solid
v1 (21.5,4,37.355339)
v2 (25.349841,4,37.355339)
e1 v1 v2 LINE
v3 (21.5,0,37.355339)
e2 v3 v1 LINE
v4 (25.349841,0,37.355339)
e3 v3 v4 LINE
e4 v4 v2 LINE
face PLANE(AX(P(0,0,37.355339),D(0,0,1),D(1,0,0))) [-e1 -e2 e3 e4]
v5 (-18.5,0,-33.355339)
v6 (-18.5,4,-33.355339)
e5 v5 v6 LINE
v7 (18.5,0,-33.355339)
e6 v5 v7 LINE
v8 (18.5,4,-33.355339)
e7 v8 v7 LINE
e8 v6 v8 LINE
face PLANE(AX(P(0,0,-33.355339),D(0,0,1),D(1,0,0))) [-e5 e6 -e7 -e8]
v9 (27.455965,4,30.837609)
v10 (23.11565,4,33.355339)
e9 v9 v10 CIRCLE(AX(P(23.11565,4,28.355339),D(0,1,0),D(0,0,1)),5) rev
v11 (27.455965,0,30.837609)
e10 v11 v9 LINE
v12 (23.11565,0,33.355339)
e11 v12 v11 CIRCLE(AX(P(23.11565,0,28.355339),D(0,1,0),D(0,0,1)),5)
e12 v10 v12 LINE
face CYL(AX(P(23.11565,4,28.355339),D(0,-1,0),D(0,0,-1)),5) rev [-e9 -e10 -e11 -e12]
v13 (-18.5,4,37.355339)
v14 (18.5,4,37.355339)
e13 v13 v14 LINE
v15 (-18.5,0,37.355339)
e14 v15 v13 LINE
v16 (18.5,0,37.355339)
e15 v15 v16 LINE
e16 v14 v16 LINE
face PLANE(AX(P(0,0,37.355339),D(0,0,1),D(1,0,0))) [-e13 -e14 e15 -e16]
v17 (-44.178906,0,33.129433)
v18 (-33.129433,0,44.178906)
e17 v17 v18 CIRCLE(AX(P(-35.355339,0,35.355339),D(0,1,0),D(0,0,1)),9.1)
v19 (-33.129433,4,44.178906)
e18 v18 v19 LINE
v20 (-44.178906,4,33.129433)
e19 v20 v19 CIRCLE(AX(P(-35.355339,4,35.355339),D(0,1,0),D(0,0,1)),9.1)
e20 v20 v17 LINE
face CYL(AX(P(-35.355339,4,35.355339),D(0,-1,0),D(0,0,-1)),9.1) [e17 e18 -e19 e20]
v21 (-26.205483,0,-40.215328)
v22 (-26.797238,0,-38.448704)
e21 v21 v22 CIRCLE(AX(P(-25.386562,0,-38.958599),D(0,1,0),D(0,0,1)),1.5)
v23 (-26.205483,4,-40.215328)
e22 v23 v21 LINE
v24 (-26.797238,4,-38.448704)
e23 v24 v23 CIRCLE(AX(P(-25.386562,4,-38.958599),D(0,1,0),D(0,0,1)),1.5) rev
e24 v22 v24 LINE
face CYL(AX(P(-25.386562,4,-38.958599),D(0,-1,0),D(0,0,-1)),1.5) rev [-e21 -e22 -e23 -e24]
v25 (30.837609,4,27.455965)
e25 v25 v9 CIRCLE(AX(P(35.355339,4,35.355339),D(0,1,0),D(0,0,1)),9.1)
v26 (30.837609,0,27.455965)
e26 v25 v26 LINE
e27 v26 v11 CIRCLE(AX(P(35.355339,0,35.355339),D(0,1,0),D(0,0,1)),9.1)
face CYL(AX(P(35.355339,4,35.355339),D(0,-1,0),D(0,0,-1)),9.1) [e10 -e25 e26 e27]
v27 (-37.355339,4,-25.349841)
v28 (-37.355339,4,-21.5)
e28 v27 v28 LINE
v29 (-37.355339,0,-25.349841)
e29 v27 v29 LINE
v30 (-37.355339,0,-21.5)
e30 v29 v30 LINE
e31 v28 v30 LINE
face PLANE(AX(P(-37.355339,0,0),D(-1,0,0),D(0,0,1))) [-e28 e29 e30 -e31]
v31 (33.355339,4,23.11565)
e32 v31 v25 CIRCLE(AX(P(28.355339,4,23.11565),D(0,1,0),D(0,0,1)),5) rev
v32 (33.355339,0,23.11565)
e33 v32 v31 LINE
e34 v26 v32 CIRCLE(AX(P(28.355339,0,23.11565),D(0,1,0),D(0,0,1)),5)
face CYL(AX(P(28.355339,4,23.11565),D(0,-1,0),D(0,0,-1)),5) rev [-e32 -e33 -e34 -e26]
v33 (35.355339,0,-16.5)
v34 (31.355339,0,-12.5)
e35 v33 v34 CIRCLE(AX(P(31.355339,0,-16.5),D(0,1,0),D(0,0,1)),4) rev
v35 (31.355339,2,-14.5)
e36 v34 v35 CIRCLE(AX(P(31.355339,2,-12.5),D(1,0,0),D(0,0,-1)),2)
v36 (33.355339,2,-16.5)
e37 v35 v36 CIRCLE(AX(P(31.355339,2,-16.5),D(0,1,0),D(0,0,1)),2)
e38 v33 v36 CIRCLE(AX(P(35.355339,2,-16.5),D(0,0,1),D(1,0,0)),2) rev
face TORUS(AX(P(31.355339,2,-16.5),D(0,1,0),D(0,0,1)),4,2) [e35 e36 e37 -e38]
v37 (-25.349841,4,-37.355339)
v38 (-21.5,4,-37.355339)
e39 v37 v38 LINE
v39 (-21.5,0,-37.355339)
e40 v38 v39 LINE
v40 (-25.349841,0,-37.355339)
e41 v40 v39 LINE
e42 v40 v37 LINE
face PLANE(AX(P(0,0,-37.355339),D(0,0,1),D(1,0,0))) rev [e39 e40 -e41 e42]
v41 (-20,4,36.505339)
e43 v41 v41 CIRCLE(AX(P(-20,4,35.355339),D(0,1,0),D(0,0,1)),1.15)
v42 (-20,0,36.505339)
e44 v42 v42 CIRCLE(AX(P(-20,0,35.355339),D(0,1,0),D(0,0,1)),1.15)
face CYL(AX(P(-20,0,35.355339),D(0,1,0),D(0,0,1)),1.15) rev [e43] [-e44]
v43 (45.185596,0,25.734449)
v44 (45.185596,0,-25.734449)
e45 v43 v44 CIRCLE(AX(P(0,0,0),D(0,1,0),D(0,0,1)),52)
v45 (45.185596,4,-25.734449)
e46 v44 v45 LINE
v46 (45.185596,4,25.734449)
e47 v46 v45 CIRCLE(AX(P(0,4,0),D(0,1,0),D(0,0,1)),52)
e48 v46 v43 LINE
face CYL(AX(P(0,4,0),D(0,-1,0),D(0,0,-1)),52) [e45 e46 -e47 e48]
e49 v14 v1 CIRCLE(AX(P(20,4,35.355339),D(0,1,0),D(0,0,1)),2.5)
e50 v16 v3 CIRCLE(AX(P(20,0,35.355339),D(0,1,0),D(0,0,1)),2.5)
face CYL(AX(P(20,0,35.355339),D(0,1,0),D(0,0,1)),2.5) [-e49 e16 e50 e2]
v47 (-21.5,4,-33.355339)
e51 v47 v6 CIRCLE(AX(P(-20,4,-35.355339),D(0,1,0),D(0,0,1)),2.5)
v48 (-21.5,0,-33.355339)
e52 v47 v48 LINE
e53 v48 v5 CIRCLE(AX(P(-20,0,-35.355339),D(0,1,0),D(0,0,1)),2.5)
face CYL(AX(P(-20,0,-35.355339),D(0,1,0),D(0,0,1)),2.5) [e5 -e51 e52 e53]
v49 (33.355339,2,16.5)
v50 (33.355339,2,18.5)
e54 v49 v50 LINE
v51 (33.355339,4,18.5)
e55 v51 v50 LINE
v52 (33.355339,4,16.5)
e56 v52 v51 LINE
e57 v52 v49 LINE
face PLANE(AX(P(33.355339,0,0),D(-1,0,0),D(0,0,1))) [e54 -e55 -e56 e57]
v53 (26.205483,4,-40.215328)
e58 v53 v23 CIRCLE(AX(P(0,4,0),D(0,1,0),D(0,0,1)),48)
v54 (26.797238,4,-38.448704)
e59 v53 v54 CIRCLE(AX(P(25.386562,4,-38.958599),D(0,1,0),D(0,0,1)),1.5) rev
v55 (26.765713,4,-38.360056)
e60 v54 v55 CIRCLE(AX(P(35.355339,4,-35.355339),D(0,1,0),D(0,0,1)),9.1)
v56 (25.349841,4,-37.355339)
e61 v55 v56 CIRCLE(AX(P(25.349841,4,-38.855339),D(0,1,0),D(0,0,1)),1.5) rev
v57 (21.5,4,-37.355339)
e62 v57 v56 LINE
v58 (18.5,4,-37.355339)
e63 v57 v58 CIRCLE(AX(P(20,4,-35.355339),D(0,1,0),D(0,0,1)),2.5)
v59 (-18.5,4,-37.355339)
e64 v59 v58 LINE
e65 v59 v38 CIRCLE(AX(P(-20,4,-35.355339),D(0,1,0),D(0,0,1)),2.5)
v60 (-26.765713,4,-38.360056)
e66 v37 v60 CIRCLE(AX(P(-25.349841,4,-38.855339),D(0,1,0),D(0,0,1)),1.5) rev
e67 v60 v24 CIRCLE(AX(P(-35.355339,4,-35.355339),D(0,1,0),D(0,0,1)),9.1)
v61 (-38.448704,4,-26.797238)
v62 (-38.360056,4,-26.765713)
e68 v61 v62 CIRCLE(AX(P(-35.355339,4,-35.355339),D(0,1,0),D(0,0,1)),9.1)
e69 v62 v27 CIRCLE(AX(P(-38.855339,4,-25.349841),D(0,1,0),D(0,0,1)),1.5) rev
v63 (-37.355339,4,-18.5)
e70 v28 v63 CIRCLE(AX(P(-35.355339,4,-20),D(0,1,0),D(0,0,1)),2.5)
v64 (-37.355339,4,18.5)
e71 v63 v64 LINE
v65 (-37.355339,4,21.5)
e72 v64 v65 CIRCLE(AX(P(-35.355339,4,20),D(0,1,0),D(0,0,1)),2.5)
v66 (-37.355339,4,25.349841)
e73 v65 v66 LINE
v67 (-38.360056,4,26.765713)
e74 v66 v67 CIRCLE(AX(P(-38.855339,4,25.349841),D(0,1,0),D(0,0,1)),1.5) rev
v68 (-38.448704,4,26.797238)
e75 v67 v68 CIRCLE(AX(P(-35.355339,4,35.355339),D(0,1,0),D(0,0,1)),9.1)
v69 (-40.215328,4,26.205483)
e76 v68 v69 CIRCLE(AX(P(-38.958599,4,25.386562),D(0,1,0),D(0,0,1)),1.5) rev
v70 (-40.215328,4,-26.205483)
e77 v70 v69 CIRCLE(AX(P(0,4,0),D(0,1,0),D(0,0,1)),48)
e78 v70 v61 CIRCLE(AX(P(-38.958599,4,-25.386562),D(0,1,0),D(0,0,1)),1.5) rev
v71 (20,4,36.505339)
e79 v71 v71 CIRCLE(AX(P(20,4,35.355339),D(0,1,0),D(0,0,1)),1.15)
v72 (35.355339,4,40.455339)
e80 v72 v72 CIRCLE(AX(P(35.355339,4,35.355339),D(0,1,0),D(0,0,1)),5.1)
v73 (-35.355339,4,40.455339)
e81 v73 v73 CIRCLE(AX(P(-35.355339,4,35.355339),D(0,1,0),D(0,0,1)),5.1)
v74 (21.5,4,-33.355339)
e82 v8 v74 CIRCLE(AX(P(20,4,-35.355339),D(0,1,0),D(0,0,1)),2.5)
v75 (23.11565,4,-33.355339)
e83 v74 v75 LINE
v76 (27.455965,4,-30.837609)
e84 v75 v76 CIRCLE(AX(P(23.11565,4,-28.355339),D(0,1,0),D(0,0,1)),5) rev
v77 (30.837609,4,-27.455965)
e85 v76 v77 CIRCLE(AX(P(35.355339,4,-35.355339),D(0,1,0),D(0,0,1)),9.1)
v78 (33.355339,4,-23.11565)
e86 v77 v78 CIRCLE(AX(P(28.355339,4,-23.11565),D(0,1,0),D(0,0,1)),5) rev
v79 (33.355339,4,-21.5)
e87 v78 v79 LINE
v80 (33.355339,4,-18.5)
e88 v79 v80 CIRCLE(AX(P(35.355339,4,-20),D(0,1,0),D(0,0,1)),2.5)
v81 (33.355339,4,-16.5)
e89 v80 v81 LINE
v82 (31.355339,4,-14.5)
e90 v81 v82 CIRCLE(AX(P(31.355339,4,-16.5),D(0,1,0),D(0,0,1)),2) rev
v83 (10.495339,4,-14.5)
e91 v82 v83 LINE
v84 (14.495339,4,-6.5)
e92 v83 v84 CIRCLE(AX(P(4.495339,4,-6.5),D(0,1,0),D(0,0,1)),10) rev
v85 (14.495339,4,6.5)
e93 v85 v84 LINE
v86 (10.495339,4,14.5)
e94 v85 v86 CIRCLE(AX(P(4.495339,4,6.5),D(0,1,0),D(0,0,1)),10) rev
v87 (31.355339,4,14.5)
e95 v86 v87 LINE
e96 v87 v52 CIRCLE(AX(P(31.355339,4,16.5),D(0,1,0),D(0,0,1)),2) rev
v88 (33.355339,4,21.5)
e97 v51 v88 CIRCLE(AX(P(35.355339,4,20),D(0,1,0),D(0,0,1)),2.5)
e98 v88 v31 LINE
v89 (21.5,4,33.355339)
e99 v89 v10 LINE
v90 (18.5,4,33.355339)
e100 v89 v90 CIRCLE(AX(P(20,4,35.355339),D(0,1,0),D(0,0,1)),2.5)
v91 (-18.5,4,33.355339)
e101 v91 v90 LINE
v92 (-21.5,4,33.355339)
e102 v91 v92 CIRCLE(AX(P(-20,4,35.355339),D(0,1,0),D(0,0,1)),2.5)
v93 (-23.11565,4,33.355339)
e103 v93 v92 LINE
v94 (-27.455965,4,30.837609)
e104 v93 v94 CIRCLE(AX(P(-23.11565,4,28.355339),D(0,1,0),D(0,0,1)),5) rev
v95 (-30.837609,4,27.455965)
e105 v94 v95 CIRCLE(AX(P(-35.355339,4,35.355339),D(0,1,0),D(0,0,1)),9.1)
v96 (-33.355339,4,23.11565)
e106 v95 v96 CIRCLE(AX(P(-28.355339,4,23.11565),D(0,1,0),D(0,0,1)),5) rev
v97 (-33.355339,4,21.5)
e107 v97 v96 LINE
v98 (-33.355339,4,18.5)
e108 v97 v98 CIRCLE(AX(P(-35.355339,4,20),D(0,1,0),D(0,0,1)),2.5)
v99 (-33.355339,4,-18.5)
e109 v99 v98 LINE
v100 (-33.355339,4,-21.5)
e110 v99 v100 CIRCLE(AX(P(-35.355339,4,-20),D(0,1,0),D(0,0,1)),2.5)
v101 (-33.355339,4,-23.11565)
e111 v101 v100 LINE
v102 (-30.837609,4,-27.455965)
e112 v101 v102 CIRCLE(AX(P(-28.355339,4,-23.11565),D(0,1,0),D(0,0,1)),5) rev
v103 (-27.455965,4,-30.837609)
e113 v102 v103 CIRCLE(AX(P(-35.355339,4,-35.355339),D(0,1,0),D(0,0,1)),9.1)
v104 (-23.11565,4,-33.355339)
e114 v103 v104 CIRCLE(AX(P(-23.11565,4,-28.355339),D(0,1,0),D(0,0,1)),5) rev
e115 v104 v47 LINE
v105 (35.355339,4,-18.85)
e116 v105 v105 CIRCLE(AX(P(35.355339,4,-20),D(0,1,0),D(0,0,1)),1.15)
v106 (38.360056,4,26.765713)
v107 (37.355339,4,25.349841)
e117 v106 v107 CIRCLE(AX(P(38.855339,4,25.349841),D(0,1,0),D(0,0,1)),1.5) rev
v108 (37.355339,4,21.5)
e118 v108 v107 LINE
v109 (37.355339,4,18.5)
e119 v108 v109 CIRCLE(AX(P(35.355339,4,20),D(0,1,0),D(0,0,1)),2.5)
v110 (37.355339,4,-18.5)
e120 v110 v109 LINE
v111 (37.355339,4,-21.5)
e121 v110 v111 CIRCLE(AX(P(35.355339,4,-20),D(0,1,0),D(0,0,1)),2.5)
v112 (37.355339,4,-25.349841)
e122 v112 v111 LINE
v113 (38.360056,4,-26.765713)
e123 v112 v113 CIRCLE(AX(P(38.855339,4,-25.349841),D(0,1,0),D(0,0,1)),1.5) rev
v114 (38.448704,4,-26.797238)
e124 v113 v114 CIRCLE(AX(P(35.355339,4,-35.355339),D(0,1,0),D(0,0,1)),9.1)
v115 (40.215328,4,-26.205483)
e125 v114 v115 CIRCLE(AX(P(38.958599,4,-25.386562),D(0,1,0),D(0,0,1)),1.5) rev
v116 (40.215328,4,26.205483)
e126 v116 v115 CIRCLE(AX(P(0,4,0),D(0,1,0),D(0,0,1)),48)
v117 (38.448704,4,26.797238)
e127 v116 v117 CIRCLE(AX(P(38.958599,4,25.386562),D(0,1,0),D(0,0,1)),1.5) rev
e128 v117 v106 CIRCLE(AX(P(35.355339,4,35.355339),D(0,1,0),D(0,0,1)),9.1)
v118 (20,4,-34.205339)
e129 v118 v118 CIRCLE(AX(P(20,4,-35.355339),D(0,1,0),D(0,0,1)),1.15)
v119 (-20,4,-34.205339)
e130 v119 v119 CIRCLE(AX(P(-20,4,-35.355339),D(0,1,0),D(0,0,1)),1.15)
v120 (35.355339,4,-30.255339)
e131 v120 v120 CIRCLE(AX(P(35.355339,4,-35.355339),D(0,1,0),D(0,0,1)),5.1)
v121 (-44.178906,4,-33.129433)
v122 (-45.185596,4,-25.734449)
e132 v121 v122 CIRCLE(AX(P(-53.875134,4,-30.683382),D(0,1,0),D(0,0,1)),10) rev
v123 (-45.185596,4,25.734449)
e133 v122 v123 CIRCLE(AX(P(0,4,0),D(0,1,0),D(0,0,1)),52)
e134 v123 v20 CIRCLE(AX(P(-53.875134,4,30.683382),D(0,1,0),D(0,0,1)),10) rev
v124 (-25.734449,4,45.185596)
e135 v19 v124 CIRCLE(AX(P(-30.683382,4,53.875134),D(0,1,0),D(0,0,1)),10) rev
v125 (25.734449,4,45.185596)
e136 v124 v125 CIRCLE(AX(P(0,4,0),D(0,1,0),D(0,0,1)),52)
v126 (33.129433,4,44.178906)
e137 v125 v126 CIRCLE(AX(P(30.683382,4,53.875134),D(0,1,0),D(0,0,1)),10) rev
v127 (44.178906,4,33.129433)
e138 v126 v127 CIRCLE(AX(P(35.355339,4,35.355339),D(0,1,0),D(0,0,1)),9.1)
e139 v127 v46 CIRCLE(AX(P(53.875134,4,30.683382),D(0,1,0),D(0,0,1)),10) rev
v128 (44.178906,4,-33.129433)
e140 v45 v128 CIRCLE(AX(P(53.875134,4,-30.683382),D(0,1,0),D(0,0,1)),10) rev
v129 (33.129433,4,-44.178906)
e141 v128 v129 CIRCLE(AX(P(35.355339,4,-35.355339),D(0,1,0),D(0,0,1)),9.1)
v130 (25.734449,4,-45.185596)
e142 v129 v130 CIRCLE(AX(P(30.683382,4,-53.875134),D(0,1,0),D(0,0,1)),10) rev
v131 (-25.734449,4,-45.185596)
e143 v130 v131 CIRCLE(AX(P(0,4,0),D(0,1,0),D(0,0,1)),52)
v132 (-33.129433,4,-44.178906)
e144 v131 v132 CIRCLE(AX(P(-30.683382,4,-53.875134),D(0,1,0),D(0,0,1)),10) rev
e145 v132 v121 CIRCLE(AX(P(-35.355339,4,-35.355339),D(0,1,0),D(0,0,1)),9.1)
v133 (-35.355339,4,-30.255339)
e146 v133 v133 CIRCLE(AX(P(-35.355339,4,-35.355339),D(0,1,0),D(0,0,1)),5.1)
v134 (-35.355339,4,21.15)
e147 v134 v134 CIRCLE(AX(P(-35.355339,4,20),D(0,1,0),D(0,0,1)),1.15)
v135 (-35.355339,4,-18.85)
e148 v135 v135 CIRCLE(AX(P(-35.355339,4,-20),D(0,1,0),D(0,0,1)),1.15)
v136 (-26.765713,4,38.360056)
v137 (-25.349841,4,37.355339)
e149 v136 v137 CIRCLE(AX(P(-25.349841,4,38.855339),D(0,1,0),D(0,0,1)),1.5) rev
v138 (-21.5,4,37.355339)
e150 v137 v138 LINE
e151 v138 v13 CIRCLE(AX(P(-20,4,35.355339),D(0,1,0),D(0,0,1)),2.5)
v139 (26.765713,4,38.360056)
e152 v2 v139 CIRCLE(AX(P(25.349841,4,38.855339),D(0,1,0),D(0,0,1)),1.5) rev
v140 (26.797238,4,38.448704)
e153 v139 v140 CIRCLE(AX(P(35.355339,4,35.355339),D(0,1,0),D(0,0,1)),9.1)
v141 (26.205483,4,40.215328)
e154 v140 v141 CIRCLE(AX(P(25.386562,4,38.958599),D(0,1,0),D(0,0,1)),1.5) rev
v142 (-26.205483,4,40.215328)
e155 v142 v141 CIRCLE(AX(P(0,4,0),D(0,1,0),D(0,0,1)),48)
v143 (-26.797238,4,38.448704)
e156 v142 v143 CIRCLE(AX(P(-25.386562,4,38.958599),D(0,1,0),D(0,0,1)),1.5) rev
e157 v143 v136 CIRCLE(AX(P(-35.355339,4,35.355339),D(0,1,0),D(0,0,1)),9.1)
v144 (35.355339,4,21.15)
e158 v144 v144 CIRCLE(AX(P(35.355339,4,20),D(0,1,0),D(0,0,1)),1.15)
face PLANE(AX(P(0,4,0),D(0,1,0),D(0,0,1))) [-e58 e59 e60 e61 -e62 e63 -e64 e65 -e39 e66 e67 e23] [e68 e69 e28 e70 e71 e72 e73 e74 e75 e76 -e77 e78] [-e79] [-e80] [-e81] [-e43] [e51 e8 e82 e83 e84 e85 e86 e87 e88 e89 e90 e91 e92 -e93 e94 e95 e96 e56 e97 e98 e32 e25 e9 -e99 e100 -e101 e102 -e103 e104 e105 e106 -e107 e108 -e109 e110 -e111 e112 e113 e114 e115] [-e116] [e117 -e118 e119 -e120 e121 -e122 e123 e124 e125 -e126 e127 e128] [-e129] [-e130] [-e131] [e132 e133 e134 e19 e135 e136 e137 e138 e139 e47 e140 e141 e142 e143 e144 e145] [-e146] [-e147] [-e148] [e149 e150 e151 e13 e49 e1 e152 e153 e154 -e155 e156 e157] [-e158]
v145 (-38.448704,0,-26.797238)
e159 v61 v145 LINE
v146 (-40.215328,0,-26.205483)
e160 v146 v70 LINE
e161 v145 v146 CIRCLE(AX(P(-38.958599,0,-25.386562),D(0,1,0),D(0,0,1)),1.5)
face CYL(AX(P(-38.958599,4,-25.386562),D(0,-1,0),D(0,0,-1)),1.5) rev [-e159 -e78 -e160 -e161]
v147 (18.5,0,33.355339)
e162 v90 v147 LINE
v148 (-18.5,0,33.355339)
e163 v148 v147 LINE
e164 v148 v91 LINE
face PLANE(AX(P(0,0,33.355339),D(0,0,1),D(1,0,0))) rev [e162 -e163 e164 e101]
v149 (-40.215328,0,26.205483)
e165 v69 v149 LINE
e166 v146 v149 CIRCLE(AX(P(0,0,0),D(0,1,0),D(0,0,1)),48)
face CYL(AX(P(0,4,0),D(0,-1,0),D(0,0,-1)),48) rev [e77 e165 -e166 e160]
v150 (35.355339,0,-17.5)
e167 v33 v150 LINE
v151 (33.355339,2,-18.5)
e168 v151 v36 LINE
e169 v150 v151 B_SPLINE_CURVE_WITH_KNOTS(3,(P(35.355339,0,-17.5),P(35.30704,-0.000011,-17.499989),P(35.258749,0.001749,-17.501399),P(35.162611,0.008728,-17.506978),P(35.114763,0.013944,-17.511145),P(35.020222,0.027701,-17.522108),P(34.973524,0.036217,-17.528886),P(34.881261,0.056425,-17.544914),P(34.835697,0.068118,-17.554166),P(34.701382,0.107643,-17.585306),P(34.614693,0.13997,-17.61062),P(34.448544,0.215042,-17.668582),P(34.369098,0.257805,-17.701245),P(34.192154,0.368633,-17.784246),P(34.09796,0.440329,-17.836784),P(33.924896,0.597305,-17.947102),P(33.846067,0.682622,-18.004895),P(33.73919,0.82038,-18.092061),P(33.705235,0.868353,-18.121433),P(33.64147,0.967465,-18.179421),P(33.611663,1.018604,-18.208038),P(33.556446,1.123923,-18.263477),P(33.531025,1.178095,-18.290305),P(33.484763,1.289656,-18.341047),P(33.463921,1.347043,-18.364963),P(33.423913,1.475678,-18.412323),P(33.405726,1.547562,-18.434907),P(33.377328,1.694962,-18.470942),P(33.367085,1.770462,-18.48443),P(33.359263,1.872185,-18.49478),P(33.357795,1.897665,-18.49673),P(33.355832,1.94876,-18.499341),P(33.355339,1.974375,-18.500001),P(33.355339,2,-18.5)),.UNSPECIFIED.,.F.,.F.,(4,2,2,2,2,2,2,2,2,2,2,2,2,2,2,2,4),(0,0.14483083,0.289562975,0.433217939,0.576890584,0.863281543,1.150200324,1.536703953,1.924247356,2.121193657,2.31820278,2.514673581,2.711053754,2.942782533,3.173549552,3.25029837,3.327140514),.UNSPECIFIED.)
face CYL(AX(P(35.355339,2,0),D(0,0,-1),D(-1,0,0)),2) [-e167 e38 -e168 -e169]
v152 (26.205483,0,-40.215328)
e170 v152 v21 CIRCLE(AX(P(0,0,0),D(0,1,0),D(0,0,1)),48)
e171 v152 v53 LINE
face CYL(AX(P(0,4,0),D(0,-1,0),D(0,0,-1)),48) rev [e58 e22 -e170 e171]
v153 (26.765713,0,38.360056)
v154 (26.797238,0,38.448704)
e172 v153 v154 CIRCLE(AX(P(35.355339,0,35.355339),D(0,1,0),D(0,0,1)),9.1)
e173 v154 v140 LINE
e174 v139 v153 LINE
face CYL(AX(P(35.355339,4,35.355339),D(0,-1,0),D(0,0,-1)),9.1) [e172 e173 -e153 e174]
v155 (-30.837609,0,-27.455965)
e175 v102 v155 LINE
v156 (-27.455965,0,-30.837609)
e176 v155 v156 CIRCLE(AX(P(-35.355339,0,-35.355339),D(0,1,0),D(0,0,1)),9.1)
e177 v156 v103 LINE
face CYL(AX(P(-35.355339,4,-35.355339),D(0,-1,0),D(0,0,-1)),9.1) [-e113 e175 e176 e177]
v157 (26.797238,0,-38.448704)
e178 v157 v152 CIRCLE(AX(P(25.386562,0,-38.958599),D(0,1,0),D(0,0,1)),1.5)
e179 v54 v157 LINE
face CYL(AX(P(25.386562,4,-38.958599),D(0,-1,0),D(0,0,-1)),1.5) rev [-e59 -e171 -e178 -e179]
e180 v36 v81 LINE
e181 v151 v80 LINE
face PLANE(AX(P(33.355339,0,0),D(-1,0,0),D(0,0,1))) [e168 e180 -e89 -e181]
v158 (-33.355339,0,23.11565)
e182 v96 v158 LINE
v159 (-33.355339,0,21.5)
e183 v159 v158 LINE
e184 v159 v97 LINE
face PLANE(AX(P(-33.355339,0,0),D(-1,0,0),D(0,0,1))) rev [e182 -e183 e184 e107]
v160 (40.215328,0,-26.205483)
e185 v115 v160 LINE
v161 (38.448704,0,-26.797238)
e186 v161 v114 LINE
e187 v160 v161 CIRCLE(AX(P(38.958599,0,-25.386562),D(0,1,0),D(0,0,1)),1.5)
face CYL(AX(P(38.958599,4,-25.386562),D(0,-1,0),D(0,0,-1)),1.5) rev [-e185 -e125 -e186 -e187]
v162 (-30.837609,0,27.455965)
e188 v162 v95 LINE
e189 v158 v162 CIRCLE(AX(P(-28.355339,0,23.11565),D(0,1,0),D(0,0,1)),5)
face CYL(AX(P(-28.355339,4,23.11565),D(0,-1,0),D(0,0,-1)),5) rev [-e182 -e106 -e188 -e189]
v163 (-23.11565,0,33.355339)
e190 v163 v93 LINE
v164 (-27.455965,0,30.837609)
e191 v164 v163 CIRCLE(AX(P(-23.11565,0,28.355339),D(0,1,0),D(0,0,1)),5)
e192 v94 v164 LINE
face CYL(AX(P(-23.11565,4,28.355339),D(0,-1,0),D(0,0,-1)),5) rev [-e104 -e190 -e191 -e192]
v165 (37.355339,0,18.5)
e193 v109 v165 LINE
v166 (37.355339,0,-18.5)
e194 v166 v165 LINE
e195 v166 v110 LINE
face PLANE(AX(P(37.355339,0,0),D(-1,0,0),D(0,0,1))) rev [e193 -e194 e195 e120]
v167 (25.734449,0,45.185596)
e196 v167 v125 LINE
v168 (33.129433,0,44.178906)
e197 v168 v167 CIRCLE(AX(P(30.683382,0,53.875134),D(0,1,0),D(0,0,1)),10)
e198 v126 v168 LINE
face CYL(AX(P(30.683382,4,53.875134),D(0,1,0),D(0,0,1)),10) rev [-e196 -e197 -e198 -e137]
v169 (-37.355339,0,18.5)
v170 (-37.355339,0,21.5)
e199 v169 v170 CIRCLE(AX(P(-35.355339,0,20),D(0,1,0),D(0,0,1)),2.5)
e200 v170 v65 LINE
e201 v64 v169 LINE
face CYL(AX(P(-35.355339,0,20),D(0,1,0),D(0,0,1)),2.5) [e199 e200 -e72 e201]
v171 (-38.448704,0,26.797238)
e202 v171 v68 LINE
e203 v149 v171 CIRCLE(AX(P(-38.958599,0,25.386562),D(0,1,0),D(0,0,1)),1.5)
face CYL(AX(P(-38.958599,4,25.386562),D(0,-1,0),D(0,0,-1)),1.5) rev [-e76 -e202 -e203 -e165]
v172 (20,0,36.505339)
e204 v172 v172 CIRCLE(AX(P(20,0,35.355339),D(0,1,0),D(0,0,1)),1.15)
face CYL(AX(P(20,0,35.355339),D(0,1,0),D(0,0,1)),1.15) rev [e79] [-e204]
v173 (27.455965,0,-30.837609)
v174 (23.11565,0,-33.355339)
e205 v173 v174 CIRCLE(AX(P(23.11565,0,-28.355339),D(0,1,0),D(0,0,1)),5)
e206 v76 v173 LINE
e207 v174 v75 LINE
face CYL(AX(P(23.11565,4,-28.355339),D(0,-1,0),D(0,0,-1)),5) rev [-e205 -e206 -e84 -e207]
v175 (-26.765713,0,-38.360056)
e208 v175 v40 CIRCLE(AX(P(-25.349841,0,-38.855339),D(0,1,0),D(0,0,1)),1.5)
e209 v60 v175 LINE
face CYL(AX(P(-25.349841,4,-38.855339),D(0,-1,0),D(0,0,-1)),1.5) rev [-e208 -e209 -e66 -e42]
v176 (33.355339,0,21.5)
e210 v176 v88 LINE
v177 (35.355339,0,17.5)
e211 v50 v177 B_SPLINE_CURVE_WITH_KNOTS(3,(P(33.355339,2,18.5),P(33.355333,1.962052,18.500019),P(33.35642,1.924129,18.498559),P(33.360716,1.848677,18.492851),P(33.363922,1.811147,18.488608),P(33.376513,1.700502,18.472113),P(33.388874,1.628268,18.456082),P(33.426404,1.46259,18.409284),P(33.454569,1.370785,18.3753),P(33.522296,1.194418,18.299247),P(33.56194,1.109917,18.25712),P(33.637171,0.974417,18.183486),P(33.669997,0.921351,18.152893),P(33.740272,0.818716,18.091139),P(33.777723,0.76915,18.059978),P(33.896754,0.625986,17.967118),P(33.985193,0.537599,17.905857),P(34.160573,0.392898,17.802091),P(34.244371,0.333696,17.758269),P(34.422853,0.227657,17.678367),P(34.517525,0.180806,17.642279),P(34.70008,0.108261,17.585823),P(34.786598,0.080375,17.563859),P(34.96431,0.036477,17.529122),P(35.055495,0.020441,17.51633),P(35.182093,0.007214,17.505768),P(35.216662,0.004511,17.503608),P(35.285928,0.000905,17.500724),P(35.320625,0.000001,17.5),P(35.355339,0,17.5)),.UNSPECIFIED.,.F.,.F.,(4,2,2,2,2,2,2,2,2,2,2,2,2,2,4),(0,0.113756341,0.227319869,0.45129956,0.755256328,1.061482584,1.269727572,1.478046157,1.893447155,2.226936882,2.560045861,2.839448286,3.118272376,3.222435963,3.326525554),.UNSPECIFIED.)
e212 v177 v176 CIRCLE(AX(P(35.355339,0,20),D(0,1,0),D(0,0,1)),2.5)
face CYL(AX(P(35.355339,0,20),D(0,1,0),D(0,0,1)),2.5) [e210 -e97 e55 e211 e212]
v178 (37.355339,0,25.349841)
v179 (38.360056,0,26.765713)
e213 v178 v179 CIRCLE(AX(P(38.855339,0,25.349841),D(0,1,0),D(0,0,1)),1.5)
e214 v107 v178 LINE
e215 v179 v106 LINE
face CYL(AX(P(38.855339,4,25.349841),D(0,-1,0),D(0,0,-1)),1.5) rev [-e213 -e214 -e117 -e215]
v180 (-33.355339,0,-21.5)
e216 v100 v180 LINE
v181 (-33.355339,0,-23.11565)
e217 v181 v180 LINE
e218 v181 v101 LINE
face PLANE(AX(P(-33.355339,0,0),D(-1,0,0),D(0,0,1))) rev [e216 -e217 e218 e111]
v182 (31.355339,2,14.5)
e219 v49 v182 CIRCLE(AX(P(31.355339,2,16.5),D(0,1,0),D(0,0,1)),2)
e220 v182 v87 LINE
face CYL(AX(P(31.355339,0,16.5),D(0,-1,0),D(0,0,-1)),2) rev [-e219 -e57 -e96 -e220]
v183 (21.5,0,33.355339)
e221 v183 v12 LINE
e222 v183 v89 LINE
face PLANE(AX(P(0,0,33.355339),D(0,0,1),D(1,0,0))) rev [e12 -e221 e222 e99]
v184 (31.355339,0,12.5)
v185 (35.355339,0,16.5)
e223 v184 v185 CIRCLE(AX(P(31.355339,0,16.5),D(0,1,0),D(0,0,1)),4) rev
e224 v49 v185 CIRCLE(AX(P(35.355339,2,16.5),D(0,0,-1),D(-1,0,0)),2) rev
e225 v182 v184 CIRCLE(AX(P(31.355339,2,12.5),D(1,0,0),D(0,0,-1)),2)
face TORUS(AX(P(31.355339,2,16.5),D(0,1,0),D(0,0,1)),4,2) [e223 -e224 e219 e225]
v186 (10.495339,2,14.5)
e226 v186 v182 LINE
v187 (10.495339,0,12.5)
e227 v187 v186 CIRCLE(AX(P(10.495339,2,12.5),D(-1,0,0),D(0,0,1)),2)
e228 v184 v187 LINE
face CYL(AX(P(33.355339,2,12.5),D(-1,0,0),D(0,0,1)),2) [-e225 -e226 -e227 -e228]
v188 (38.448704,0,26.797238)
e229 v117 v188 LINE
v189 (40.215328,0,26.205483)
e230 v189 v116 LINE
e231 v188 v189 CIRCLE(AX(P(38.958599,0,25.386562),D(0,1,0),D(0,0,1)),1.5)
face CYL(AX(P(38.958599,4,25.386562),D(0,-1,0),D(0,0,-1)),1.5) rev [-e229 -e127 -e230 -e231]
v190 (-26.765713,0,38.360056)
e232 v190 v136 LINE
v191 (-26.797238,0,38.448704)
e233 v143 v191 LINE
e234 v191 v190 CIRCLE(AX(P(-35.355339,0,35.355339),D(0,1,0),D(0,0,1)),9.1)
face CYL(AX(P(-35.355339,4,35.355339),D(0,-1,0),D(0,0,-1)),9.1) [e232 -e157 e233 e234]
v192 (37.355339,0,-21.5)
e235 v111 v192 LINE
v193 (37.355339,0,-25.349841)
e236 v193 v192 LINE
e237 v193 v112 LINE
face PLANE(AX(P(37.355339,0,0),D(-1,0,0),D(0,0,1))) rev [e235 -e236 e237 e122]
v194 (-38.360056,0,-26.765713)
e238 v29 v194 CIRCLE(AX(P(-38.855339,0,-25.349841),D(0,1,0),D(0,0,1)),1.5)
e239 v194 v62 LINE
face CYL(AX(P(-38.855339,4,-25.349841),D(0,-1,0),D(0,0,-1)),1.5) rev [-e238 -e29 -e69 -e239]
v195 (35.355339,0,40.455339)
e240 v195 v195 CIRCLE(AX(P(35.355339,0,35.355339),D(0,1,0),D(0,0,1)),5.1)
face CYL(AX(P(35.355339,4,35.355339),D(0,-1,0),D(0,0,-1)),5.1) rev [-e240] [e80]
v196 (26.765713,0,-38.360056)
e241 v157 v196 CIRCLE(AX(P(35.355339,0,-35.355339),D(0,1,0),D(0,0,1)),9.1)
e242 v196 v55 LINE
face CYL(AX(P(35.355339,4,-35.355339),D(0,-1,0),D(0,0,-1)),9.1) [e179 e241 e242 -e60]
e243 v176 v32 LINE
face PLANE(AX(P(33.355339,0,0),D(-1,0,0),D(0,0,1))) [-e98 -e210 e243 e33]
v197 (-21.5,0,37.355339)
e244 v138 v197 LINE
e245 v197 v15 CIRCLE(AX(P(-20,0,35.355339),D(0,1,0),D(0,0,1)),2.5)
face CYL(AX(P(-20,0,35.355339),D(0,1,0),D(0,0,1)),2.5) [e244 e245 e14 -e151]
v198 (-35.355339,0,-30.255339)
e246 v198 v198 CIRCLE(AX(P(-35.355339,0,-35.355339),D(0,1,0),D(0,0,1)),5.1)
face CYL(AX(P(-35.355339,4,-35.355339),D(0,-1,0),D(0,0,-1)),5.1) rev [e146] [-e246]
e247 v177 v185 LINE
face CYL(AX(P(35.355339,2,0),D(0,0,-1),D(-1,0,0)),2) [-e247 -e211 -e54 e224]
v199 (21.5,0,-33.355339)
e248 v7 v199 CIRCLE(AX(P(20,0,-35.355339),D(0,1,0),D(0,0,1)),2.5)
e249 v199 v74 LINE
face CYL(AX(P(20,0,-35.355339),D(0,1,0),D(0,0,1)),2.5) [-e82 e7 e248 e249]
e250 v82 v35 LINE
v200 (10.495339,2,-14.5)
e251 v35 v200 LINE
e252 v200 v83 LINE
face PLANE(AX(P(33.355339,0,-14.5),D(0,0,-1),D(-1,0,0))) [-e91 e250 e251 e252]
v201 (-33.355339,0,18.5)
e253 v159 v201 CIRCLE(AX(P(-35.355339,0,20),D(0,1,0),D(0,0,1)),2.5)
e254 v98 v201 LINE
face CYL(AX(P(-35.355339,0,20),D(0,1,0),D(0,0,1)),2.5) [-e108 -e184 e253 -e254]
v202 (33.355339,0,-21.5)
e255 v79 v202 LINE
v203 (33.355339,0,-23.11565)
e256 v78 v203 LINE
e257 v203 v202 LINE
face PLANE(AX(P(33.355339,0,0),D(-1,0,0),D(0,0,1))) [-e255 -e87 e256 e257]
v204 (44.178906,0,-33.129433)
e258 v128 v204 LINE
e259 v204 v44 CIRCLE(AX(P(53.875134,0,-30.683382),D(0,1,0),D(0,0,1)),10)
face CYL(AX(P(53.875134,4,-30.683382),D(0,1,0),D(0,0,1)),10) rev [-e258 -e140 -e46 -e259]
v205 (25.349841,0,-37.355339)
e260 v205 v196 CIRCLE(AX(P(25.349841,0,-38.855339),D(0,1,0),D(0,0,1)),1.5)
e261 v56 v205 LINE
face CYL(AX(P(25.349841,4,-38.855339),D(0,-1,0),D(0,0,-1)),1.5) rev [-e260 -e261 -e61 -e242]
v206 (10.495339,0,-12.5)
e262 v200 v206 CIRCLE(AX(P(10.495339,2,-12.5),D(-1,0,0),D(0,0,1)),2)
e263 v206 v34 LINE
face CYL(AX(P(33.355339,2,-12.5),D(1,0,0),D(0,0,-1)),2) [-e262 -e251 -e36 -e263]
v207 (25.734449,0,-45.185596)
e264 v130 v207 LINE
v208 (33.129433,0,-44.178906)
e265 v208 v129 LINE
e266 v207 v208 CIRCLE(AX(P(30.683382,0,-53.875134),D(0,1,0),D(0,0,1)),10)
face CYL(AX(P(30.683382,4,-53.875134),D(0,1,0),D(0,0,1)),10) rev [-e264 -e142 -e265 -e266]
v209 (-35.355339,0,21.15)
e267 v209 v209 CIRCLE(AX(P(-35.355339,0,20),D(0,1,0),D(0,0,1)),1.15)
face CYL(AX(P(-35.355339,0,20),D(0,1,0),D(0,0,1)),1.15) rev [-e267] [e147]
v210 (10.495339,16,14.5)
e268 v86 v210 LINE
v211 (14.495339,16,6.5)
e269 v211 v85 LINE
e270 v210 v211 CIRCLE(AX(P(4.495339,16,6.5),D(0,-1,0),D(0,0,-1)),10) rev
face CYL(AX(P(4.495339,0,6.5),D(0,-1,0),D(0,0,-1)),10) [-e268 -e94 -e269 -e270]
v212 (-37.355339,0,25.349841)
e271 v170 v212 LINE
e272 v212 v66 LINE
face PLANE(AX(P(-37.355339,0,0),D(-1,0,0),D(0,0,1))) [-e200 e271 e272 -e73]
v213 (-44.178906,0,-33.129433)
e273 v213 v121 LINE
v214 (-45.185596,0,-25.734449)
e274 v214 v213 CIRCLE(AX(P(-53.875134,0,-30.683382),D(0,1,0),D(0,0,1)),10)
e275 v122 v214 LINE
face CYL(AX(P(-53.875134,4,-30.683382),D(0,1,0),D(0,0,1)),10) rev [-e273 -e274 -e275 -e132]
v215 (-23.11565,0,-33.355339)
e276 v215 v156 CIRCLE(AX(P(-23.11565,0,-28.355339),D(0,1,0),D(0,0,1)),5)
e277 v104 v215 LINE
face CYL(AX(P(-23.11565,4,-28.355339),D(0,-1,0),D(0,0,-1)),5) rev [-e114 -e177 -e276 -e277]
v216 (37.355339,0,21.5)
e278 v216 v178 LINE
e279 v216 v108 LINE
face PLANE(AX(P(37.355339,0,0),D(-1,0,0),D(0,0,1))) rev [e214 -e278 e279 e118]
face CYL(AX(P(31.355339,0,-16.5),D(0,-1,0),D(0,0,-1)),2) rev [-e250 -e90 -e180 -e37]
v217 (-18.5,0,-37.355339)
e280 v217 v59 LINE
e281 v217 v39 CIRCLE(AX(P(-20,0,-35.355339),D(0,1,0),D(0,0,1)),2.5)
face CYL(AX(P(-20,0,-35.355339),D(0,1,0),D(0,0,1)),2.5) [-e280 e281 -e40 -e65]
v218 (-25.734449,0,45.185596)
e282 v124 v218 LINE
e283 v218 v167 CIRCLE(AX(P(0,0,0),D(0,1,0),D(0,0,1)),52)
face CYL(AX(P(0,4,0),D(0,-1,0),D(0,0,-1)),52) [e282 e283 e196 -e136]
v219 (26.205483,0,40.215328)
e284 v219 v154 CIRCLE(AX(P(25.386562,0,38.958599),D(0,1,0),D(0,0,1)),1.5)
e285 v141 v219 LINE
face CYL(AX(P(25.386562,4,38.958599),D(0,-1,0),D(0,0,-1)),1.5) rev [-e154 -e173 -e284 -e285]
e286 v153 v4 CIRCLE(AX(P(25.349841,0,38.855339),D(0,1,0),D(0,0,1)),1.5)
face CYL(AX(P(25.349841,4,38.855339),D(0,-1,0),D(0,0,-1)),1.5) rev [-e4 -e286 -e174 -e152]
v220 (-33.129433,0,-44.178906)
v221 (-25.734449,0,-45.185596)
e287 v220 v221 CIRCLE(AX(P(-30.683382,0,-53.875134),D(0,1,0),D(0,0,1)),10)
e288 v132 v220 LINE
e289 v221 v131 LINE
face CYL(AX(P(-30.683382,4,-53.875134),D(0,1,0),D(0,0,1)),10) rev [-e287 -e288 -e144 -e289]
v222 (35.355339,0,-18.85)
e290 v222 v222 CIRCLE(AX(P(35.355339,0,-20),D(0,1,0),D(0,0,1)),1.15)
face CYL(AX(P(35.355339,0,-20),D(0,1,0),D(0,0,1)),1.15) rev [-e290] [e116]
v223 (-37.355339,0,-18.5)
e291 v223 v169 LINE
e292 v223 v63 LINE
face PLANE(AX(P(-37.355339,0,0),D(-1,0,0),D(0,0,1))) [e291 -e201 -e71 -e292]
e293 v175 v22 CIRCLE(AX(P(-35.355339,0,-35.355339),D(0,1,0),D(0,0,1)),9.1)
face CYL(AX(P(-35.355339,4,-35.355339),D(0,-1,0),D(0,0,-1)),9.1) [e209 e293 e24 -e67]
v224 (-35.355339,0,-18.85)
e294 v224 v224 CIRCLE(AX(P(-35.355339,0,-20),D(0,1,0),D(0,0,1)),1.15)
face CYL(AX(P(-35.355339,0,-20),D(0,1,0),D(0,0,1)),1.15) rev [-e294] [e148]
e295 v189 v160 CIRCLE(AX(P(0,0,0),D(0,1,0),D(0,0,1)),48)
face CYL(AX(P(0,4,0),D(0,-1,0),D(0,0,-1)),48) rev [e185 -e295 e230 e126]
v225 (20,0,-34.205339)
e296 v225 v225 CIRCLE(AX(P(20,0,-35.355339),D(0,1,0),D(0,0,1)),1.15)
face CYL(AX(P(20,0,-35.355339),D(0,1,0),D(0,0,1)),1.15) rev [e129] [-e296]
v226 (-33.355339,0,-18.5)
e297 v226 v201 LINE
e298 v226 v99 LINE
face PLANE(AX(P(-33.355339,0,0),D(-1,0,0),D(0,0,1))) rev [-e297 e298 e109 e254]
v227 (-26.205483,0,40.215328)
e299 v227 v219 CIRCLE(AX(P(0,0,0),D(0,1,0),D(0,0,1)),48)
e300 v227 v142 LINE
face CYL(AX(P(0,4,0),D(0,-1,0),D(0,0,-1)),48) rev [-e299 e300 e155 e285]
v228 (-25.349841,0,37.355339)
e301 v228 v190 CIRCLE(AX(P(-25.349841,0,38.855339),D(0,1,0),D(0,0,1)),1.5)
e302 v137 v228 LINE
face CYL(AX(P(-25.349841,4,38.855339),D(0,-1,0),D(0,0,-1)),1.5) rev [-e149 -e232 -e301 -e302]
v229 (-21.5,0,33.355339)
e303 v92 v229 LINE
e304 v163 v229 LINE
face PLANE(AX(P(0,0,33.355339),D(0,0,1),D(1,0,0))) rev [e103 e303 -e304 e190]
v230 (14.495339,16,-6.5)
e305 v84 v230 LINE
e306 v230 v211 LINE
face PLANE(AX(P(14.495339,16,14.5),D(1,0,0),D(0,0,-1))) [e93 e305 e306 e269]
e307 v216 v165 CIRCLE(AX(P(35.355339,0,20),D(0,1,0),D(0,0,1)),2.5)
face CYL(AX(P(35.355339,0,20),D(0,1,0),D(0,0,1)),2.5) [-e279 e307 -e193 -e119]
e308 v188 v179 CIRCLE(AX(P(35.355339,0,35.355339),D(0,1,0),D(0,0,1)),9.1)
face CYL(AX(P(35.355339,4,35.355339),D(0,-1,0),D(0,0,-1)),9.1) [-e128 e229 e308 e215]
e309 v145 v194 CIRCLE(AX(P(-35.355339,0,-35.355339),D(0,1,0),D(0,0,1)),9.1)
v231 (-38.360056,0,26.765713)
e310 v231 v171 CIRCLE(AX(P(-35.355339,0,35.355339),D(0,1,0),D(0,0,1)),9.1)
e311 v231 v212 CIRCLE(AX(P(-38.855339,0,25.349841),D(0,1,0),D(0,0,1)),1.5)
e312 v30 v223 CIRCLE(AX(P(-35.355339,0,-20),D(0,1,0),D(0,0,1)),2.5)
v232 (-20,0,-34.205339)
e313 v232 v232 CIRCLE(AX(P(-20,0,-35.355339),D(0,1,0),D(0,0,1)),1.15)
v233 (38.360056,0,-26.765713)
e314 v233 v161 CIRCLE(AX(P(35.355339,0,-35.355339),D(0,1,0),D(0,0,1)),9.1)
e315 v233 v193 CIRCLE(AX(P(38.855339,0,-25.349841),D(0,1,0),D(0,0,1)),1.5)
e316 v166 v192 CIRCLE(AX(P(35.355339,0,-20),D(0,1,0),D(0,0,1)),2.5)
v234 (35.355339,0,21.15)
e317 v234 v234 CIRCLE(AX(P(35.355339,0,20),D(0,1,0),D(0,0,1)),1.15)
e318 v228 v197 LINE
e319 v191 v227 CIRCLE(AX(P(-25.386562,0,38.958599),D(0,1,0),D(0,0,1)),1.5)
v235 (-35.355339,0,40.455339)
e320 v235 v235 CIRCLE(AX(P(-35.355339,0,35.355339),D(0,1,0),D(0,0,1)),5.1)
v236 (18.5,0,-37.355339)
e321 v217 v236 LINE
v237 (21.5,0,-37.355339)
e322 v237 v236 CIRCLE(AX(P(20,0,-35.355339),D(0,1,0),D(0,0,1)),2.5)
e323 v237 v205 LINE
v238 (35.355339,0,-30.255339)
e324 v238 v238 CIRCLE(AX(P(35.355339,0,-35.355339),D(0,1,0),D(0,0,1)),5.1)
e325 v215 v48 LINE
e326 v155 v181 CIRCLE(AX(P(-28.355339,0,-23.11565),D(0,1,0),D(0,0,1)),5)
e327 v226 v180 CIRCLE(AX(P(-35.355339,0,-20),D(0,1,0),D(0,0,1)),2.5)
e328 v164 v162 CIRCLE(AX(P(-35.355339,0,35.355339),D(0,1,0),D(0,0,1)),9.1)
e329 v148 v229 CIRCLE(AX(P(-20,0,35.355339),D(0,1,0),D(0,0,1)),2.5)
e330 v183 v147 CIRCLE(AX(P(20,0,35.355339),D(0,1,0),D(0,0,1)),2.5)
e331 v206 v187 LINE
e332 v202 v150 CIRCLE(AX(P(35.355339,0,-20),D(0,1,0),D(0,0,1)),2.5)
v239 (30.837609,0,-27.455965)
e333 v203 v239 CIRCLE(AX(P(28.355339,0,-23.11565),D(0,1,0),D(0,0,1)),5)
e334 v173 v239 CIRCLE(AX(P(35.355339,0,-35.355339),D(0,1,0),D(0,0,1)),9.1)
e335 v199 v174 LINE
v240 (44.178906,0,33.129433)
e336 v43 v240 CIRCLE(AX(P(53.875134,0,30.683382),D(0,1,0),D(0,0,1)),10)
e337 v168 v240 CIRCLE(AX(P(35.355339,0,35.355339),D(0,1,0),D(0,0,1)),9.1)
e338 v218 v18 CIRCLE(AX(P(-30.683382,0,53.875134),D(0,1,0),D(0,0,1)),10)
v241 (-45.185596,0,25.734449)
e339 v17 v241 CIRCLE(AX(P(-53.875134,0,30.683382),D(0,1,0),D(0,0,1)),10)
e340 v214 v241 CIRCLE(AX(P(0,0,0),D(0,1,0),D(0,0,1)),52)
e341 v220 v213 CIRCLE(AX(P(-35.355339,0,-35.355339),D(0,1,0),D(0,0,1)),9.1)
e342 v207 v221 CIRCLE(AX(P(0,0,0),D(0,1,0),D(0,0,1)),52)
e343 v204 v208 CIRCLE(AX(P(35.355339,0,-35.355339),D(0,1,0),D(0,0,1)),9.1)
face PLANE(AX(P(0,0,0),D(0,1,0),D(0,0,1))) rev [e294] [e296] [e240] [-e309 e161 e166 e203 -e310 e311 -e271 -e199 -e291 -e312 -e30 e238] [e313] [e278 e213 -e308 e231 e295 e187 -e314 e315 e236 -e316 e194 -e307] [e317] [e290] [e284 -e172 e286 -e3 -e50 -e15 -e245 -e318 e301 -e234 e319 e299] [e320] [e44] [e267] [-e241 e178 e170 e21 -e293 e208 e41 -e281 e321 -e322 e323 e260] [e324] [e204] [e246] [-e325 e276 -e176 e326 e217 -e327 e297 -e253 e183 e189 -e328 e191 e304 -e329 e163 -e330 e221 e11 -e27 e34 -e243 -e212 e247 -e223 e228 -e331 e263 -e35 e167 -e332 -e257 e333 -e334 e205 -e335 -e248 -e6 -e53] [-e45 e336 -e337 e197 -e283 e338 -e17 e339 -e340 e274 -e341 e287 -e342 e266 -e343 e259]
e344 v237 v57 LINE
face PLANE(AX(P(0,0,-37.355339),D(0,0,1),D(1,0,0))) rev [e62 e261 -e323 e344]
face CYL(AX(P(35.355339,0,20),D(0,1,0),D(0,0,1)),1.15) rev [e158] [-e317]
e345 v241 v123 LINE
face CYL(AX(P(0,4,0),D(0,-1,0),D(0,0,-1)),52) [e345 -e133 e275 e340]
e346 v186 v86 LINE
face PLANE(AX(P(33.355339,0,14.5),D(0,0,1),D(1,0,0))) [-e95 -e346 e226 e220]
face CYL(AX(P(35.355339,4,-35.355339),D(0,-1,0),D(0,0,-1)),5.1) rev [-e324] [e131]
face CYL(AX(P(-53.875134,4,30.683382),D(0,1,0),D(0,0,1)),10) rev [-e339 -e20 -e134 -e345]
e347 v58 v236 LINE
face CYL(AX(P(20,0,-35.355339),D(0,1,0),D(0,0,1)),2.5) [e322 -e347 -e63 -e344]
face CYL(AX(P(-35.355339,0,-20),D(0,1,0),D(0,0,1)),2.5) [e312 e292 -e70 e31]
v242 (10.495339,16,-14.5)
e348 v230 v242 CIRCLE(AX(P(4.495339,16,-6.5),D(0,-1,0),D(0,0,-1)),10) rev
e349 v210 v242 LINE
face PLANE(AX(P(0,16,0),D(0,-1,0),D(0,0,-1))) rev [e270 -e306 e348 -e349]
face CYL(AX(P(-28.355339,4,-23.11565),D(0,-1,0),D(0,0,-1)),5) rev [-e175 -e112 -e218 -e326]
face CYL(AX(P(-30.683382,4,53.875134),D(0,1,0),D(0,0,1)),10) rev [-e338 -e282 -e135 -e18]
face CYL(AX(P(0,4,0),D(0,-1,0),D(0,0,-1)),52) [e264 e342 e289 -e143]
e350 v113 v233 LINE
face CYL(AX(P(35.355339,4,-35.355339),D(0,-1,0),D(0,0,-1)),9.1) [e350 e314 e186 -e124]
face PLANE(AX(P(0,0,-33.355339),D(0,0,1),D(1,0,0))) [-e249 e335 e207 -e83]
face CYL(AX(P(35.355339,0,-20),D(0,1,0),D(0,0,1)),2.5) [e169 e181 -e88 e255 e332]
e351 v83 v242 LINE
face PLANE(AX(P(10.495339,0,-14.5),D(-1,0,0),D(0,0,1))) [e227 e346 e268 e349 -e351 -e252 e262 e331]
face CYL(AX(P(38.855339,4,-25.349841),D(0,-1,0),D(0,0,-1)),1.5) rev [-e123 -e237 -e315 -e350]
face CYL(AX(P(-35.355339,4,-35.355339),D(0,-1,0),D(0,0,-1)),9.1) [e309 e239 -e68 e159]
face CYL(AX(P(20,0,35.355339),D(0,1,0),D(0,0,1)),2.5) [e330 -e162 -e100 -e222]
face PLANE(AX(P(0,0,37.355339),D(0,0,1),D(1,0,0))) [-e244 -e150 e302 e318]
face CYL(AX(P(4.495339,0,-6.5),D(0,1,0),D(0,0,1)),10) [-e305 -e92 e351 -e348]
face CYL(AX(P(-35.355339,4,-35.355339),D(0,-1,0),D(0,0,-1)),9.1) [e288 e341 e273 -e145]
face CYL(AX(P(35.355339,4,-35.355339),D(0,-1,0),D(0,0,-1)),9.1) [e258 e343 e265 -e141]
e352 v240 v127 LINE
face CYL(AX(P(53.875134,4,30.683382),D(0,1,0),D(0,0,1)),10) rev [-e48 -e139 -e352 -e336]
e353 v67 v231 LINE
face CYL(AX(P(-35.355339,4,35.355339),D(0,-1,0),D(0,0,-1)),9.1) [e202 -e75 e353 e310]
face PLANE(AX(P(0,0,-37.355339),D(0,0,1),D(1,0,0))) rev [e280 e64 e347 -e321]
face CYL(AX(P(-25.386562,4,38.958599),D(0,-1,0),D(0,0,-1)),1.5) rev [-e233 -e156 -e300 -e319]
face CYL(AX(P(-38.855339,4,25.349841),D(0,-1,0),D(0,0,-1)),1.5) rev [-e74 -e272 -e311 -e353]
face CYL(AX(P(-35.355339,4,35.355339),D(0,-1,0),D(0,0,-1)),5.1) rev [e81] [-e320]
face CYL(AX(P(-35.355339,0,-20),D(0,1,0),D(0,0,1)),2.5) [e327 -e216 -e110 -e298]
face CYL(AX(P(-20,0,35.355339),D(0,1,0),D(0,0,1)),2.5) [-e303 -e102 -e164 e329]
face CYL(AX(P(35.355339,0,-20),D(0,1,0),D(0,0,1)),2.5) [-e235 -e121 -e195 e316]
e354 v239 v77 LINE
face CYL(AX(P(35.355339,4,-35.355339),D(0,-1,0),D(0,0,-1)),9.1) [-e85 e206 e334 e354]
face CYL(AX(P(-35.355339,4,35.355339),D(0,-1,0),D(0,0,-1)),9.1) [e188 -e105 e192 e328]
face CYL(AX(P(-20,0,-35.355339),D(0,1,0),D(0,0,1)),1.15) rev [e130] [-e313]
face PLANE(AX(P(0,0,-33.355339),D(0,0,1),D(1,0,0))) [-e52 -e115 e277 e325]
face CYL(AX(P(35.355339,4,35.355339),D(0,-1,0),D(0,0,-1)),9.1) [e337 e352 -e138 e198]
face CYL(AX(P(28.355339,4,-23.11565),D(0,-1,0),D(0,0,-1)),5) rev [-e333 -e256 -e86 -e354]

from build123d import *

# Parameters (mm, degrees)
SKETCH1_R           = 5.1
BOSS_EXTRUDE1_DEPTH = 4
BOSS_EXTRUDE2_START = -4
BOSS_EXTRUDE2_DEPTH = 4
SKETCH3_R           = 2.5
BOSS_EXTRUDE3_DEPTH = 4
SKETCH4_R           = 1.15
CUT_EXTRUDE1_DEPTH  = 4
FILLET1_R           = 10
FILLET2_R           = 1.5
FILLET3_R           = 5
SKETCH5_W           = 22.86
SKETCH5_H           = 29
BOSS_EXTRUDE4_DEPTH = 4
SKETCH6_W           = 4
SKETCH6_H           = 29
BOSS_EXTRUDE5_DEPTH = 16
FILLET4_R           = 10
FILLET5_R           = 2


with BuildPart() as part:
    # Sketch1 → Boss-Extrude1 (new body)
    with BuildSketch(Plane(origin=(0, 0, 0), x_dir=(1, 0, 0), z_dir=(0, 1, 0))):
        with BuildLine():
            ThreePointArc((-42.589636172, 29.834927363), (-52, 0), (-42.589636172, -29.834927363))
            ThreePointArc((-42.589636172, -29.834927363), (-41.790010768, -41.790010768), (-29.834927363, -42.589636172))
            ThreePointArc((-29.834927363, -42.589636172), (0, -52), (29.834927363, -42.589636172))
            ThreePointArc((29.834927363, -42.589636172), (41.790010768, -41.790010768), (42.589636172, -29.834927363))
            ThreePointArc((42.589636172, -29.834927363), (52, 0), (42.589636172, 29.834927363))
            ThreePointArc((42.589636172, 29.834927363), (41.790010768, 41.790010768), (29.834927363, 42.589636172))
            ThreePointArc((29.834927363, 42.589636172), (0, 52), (-29.834927363, 42.589636172))
            ThreePointArc((-29.834927363, 42.589636172), (-41.790010768, 41.790010768), (-42.589636172, 29.834927363))
        make_face()
        with Locations(Location((-35.355339059, -35.355339059, 0), (0, 0, 270))):
            Circle(SKETCH1_R, mode=Mode.SUBTRACT)
        with Locations(Location((35.355339059, -35.355339059, 0), (0, 0, 270))):
            Circle(SKETCH1_R, mode=Mode.SUBTRACT)
        with BuildLine():
            ThreePointArc((-27.258640426, -39.509068859), (-28.920667351, -28.920667351), (-39.509068859, -27.258640426))
            ThreePointArc((-39.509068859, -27.258640426), (-48, 0), (-39.509068859, 27.258640426))
            ThreePointArc((-39.509068859, 27.258640426), (-28.920667351, 28.920667351), (-27.258640426, 39.509068859))
            ThreePointArc((-27.258640426, 39.509068859), (0, 48), (27.258640426, 39.509068859))
            ThreePointArc((27.258640426, 39.509068859), (28.920667351, 28.920667351), (39.509068859, 27.258640426))
            ThreePointArc((39.509068859, 27.258640426), (48, 0), (39.509068859, -27.258640426))
            ThreePointArc((39.509068859, -27.258640426), (28.920667351, -28.920667351), (27.258640426, -39.509068859))
            ThreePointArc((27.258640426, -39.509068859), (0, -48), (-27.258640426, -39.509068859))
        make_face(mode=Mode.SUBTRACT)
        with Locations(Location((-35.355339059, 35.355339059, 0), (0, 0, 270))):
            Circle(SKETCH1_R, mode=Mode.SUBTRACT)
        with Locations(Location((35.355339059, 35.355339059, 0), (0, 0, 270))):
            Circle(SKETCH1_R, mode=Mode.SUBTRACT)
    extrude(amount=BOSS_EXTRUDE1_DEPTH)

    # Sketch2 → Boss-Extrude2 (add)
    with BuildSketch(Plane(origin=(0, 4, 0), x_dir=(1, 0, 0), z_dir=(0, 1, 0)).offset(BOSS_EXTRUDE2_START)):
        with BuildLine():
            ThreePointArc((-26.255339059, 35.355339059), (-26.311135203, 34.349169788), (-26.477839411, 33.355339059))
            Line((-26.477839411, 33.355339059), (26.477839411, 33.355339059))
            ThreePointArc((26.477839411, 33.355339059), (26.255339059, 35.355339059), (26.477839411, 37.355339059))
            Line((26.477839411, 37.355339059), (-26.477839411, 37.355339059))
            ThreePointArc((-26.477839411, 37.355339059), (-26.311135203, 36.36150833), (-26.255339059, 35.355339059))
        make_face()
        with BuildLine():
            Line((-33.355339059, -26.477839411), (-33.355339059, 26.477839411))
            ThreePointArc((-33.355339059, 26.477839411), (-35.355339059, 26.255339059), (-37.355339059, 26.477839411))
            Line((-37.355339059, 26.477839411), (-37.355339059, -26.477839411))
            ThreePointArc((-37.355339059, -26.477839411), (-35.355339059, -26.255339059), (-33.355339059, -26.477839411))
        make_face()
        with BuildLine():
            ThreePointArc((37.355339059, 26.477839411), (35.355339059, 26.255339059), (33.355339059, 26.477839411))
            Line((33.355339059, 26.477839411), (33.355339059, -26.477839411))
            ThreePointArc((33.355339059, -26.477839411), (35.355339059, -26.255339059), (37.355339059, -26.477839411))
            Line((37.355339059, -26.477839411), (37.355339059, 26.477839411))
        make_face()
        with BuildLine():
            Line((26.477839411, -33.355339059), (-26.477839411, -33.355339059))
            ThreePointArc((-26.477839411, -33.355339059), (-26.311135203, -34.349169788), (-26.255339059, -35.355339059))
            ThreePointArc((-26.255339059, -35.355339059), (-26.311135203, -36.36150833), (-26.477839411, -37.355339059))
            Line((-26.477839411, -37.355339059), (26.477839411, -37.355339059))
            ThreePointArc((26.477839411, -37.355339059), (26.255339059, -35.355339059), (26.477839411, -33.355339059))
        make_face()
    extrude(amount=BOSS_EXTRUDE2_DEPTH)

    # Sketch3 → Boss-Extrude3 (add)
    with BuildSketch(Plane(origin=(0, 4, 0), x_dir=(1, 0, 0), z_dir=(0, 1, 0))):
        with Locations((-20, 35.355339059)):
            Circle(SKETCH3_R)
        with Locations((20, 35.355339059)):
            Circle(SKETCH3_R)
        with Locations((35.355339059, 20)):
            Circle(SKETCH3_R)
        with Locations((35.355339059, -20)):
            Circle(SKETCH3_R)
        with Locations((-35.355339059, -20)):
            Circle(SKETCH3_R)
        with Locations((-35.355339059, 20)):
            Circle(SKETCH3_R)
        with Locations((-20, -35.355339059)):
            Circle(SKETCH3_R)
        with Locations((20, -35.355339059)):
            Circle(SKETCH3_R)
    extrude(amount=-BOSS_EXTRUDE3_DEPTH)

    # Sketch4 → Cut-Extrude1 (cut)
    with BuildSketch(Plane(origin=(0, 4, 0), x_dir=(1, 0, 0), z_dir=(0, 1, 0))):
        with Locations(Location((-20, 35.355339059, 0), (0, 0, 270))):
            Circle(SKETCH4_R)
        with Locations(Location((20, 35.355339059, 0), (0, 0, 270))):
            Circle(SKETCH4_R)
        with Locations(Location((-35.355339059, 20, 0), (0, 0, 270))):
            Circle(SKETCH4_R)
        with Locations(Location((-35.355339059, -20, 0), (0, 0, 270))):
            Circle(SKETCH4_R)
        with Locations(Location((-20, -35.355339059, 0), (0, 0, 270))):
            Circle(SKETCH4_R)
        with Locations(Location((20, -35.355339059, 0), (0, 0, 270))):
            Circle(SKETCH4_R)
        with Locations(Location((35.355339059, -20, 0), (0, 0, 270))):
            Circle(SKETCH4_R)
        with Locations(Location((35.355339059, 20, 0), (0, 0, 270))):
            Circle(SKETCH4_R)
    extrude(amount=-CUT_EXTRUDE1_DEPTH, mode=Mode.SUBTRACT)

    # Fillet1
    fillet1_edges = [part.edges().sort_by_distance(p)[0] for p in [
        (-42.589636172, 2, 29.834927363),
        (-42.589636172, 2, -29.834927363),
        (-29.834927363, 2, -42.589636172),
        (29.834927363, 2, -42.589636172),
        (42.589636172, 2, -29.834927363),
        (42.589636172, 2, 29.834927363),
        (29.834927363, 2, 42.589636172),
        (-29.834927363, 2, 42.589636172),
    ]]
    fillet(fillet1_edges, radius=FILLET1_R)

    # Fillet2
    fillet2_edges = [part.edges().sort_by_distance(p)[0] for p in [
        (37.355339059, 2, -26.477839411),
        (37.355339059, 2, 26.477839411),
        (-26.477839411, 2, 37.355339059),
        (26.477839411, 2, 37.355339059),
        (27.258640426, 2, 39.509068859),
        (39.509068859, 2, 27.258640426),
        (39.509068859, 2, -27.258640426),
        (27.258640426, 2, -39.509068859),
        (-27.258640426, 2, -39.509068859),
        (-39.509068859, 2, -27.258640426),
        (-39.509068859, 2, 27.258640426),
        (-27.258640426, 2, 39.509068859),
        (-26.477839411, 2, -37.355339059),
        (26.477839411, 2, -37.355339059),
        (-37.355339059, 2, -26.477839411),
        (-37.355339059, 2, 26.477839411),
    ]]
    fillet(fillet2_edges, radius=FILLET2_R)

    # Fillet3
    fillet3_edges = [part.edges().sort_by_distance(p)[0] for p in [
        (33.355339059, 2, -26.477839411),
        (33.355339059, 2, 26.477839411),
        (-26.477839411, 2, 33.355339059),
        (26.477839411, 2, 33.355339059),
        (-26.477839411, 2, -33.355339059),
        (26.477839411, 2, -33.355339059),
        (-33.355339059, 2, -26.477839411),
        (-33.355339059, 2, 26.477839411),
    ]]
    fillet(fillet3_edges, radius=FILLET3_R)

    # Sketch5 → Boss-Extrude4 (add)
    with BuildSketch(Plane(origin=(0, 4, 0), x_dir=(1, 0, 0), z_dir=(0, 1, 0))):
        with Locations((21.925339059, 0)):
            Rectangle(SKETCH5_W, SKETCH5_H)
    extrude(amount=-BOSS_EXTRUDE4_DEPTH)

    # Sketch6 → Boss-Extrude5 (add)
    with BuildSketch(Plane.XZ):
        with Locations((12.495339059, 0)):
            Rectangle(SKETCH6_W, SKETCH6_H)
    extrude(amount=-BOSS_EXTRUDE5_DEPTH)

    # Fillet4
    # the kernel refuses this fillet: 10 mm, written as the material it takes off along each edge
    with BuildSketch(Plane(origin=(14.495339059, 4, -14.5), x_dir=(0, 0, 1), z_dir=(0, 1, 0))) as fillet4_piece_1:
        with BuildLine():
            CenterArc((8, -10), FILLET4_R, 90, 53.130102354)
            Line((0, -4), (0, 0))
            Line((0, 0), (8, 0))
        make_face()
    extrude(amount=32, mode=Mode.SUBTRACT)
    with BuildSketch(Plane(origin=(14.495339059, 4, 14.5), x_dir=(0, 0, -1), z_dir=(0, 1, 0))) as fillet4_piece_2:
        with BuildLine():
            CenterArc((8, 10), FILLET4_R, 216.869897646, 53.130102354)
            Line((0, 4), (0, 0))
            Line((0, 0), (8, 0))
        make_face()
    extrude(amount=32, mode=Mode.SUBTRACT)

    # Fillet5
    fillet5_edges = [part.edges().sort_by_distance(p)[0] for p in [
        (33.355339059, 0, 16.5),
        (33.355339059, 2, -14.5),
        (21.925339059, 0, 14.5),
        (33.355339059, 2, 14.5),
        (21.925339059, 0, -14.5),
        (33.355339059, 0, -16.5),
    ]]
    fillet(fillet5_edges, radius=FILLET5_R)


solid = part.part
